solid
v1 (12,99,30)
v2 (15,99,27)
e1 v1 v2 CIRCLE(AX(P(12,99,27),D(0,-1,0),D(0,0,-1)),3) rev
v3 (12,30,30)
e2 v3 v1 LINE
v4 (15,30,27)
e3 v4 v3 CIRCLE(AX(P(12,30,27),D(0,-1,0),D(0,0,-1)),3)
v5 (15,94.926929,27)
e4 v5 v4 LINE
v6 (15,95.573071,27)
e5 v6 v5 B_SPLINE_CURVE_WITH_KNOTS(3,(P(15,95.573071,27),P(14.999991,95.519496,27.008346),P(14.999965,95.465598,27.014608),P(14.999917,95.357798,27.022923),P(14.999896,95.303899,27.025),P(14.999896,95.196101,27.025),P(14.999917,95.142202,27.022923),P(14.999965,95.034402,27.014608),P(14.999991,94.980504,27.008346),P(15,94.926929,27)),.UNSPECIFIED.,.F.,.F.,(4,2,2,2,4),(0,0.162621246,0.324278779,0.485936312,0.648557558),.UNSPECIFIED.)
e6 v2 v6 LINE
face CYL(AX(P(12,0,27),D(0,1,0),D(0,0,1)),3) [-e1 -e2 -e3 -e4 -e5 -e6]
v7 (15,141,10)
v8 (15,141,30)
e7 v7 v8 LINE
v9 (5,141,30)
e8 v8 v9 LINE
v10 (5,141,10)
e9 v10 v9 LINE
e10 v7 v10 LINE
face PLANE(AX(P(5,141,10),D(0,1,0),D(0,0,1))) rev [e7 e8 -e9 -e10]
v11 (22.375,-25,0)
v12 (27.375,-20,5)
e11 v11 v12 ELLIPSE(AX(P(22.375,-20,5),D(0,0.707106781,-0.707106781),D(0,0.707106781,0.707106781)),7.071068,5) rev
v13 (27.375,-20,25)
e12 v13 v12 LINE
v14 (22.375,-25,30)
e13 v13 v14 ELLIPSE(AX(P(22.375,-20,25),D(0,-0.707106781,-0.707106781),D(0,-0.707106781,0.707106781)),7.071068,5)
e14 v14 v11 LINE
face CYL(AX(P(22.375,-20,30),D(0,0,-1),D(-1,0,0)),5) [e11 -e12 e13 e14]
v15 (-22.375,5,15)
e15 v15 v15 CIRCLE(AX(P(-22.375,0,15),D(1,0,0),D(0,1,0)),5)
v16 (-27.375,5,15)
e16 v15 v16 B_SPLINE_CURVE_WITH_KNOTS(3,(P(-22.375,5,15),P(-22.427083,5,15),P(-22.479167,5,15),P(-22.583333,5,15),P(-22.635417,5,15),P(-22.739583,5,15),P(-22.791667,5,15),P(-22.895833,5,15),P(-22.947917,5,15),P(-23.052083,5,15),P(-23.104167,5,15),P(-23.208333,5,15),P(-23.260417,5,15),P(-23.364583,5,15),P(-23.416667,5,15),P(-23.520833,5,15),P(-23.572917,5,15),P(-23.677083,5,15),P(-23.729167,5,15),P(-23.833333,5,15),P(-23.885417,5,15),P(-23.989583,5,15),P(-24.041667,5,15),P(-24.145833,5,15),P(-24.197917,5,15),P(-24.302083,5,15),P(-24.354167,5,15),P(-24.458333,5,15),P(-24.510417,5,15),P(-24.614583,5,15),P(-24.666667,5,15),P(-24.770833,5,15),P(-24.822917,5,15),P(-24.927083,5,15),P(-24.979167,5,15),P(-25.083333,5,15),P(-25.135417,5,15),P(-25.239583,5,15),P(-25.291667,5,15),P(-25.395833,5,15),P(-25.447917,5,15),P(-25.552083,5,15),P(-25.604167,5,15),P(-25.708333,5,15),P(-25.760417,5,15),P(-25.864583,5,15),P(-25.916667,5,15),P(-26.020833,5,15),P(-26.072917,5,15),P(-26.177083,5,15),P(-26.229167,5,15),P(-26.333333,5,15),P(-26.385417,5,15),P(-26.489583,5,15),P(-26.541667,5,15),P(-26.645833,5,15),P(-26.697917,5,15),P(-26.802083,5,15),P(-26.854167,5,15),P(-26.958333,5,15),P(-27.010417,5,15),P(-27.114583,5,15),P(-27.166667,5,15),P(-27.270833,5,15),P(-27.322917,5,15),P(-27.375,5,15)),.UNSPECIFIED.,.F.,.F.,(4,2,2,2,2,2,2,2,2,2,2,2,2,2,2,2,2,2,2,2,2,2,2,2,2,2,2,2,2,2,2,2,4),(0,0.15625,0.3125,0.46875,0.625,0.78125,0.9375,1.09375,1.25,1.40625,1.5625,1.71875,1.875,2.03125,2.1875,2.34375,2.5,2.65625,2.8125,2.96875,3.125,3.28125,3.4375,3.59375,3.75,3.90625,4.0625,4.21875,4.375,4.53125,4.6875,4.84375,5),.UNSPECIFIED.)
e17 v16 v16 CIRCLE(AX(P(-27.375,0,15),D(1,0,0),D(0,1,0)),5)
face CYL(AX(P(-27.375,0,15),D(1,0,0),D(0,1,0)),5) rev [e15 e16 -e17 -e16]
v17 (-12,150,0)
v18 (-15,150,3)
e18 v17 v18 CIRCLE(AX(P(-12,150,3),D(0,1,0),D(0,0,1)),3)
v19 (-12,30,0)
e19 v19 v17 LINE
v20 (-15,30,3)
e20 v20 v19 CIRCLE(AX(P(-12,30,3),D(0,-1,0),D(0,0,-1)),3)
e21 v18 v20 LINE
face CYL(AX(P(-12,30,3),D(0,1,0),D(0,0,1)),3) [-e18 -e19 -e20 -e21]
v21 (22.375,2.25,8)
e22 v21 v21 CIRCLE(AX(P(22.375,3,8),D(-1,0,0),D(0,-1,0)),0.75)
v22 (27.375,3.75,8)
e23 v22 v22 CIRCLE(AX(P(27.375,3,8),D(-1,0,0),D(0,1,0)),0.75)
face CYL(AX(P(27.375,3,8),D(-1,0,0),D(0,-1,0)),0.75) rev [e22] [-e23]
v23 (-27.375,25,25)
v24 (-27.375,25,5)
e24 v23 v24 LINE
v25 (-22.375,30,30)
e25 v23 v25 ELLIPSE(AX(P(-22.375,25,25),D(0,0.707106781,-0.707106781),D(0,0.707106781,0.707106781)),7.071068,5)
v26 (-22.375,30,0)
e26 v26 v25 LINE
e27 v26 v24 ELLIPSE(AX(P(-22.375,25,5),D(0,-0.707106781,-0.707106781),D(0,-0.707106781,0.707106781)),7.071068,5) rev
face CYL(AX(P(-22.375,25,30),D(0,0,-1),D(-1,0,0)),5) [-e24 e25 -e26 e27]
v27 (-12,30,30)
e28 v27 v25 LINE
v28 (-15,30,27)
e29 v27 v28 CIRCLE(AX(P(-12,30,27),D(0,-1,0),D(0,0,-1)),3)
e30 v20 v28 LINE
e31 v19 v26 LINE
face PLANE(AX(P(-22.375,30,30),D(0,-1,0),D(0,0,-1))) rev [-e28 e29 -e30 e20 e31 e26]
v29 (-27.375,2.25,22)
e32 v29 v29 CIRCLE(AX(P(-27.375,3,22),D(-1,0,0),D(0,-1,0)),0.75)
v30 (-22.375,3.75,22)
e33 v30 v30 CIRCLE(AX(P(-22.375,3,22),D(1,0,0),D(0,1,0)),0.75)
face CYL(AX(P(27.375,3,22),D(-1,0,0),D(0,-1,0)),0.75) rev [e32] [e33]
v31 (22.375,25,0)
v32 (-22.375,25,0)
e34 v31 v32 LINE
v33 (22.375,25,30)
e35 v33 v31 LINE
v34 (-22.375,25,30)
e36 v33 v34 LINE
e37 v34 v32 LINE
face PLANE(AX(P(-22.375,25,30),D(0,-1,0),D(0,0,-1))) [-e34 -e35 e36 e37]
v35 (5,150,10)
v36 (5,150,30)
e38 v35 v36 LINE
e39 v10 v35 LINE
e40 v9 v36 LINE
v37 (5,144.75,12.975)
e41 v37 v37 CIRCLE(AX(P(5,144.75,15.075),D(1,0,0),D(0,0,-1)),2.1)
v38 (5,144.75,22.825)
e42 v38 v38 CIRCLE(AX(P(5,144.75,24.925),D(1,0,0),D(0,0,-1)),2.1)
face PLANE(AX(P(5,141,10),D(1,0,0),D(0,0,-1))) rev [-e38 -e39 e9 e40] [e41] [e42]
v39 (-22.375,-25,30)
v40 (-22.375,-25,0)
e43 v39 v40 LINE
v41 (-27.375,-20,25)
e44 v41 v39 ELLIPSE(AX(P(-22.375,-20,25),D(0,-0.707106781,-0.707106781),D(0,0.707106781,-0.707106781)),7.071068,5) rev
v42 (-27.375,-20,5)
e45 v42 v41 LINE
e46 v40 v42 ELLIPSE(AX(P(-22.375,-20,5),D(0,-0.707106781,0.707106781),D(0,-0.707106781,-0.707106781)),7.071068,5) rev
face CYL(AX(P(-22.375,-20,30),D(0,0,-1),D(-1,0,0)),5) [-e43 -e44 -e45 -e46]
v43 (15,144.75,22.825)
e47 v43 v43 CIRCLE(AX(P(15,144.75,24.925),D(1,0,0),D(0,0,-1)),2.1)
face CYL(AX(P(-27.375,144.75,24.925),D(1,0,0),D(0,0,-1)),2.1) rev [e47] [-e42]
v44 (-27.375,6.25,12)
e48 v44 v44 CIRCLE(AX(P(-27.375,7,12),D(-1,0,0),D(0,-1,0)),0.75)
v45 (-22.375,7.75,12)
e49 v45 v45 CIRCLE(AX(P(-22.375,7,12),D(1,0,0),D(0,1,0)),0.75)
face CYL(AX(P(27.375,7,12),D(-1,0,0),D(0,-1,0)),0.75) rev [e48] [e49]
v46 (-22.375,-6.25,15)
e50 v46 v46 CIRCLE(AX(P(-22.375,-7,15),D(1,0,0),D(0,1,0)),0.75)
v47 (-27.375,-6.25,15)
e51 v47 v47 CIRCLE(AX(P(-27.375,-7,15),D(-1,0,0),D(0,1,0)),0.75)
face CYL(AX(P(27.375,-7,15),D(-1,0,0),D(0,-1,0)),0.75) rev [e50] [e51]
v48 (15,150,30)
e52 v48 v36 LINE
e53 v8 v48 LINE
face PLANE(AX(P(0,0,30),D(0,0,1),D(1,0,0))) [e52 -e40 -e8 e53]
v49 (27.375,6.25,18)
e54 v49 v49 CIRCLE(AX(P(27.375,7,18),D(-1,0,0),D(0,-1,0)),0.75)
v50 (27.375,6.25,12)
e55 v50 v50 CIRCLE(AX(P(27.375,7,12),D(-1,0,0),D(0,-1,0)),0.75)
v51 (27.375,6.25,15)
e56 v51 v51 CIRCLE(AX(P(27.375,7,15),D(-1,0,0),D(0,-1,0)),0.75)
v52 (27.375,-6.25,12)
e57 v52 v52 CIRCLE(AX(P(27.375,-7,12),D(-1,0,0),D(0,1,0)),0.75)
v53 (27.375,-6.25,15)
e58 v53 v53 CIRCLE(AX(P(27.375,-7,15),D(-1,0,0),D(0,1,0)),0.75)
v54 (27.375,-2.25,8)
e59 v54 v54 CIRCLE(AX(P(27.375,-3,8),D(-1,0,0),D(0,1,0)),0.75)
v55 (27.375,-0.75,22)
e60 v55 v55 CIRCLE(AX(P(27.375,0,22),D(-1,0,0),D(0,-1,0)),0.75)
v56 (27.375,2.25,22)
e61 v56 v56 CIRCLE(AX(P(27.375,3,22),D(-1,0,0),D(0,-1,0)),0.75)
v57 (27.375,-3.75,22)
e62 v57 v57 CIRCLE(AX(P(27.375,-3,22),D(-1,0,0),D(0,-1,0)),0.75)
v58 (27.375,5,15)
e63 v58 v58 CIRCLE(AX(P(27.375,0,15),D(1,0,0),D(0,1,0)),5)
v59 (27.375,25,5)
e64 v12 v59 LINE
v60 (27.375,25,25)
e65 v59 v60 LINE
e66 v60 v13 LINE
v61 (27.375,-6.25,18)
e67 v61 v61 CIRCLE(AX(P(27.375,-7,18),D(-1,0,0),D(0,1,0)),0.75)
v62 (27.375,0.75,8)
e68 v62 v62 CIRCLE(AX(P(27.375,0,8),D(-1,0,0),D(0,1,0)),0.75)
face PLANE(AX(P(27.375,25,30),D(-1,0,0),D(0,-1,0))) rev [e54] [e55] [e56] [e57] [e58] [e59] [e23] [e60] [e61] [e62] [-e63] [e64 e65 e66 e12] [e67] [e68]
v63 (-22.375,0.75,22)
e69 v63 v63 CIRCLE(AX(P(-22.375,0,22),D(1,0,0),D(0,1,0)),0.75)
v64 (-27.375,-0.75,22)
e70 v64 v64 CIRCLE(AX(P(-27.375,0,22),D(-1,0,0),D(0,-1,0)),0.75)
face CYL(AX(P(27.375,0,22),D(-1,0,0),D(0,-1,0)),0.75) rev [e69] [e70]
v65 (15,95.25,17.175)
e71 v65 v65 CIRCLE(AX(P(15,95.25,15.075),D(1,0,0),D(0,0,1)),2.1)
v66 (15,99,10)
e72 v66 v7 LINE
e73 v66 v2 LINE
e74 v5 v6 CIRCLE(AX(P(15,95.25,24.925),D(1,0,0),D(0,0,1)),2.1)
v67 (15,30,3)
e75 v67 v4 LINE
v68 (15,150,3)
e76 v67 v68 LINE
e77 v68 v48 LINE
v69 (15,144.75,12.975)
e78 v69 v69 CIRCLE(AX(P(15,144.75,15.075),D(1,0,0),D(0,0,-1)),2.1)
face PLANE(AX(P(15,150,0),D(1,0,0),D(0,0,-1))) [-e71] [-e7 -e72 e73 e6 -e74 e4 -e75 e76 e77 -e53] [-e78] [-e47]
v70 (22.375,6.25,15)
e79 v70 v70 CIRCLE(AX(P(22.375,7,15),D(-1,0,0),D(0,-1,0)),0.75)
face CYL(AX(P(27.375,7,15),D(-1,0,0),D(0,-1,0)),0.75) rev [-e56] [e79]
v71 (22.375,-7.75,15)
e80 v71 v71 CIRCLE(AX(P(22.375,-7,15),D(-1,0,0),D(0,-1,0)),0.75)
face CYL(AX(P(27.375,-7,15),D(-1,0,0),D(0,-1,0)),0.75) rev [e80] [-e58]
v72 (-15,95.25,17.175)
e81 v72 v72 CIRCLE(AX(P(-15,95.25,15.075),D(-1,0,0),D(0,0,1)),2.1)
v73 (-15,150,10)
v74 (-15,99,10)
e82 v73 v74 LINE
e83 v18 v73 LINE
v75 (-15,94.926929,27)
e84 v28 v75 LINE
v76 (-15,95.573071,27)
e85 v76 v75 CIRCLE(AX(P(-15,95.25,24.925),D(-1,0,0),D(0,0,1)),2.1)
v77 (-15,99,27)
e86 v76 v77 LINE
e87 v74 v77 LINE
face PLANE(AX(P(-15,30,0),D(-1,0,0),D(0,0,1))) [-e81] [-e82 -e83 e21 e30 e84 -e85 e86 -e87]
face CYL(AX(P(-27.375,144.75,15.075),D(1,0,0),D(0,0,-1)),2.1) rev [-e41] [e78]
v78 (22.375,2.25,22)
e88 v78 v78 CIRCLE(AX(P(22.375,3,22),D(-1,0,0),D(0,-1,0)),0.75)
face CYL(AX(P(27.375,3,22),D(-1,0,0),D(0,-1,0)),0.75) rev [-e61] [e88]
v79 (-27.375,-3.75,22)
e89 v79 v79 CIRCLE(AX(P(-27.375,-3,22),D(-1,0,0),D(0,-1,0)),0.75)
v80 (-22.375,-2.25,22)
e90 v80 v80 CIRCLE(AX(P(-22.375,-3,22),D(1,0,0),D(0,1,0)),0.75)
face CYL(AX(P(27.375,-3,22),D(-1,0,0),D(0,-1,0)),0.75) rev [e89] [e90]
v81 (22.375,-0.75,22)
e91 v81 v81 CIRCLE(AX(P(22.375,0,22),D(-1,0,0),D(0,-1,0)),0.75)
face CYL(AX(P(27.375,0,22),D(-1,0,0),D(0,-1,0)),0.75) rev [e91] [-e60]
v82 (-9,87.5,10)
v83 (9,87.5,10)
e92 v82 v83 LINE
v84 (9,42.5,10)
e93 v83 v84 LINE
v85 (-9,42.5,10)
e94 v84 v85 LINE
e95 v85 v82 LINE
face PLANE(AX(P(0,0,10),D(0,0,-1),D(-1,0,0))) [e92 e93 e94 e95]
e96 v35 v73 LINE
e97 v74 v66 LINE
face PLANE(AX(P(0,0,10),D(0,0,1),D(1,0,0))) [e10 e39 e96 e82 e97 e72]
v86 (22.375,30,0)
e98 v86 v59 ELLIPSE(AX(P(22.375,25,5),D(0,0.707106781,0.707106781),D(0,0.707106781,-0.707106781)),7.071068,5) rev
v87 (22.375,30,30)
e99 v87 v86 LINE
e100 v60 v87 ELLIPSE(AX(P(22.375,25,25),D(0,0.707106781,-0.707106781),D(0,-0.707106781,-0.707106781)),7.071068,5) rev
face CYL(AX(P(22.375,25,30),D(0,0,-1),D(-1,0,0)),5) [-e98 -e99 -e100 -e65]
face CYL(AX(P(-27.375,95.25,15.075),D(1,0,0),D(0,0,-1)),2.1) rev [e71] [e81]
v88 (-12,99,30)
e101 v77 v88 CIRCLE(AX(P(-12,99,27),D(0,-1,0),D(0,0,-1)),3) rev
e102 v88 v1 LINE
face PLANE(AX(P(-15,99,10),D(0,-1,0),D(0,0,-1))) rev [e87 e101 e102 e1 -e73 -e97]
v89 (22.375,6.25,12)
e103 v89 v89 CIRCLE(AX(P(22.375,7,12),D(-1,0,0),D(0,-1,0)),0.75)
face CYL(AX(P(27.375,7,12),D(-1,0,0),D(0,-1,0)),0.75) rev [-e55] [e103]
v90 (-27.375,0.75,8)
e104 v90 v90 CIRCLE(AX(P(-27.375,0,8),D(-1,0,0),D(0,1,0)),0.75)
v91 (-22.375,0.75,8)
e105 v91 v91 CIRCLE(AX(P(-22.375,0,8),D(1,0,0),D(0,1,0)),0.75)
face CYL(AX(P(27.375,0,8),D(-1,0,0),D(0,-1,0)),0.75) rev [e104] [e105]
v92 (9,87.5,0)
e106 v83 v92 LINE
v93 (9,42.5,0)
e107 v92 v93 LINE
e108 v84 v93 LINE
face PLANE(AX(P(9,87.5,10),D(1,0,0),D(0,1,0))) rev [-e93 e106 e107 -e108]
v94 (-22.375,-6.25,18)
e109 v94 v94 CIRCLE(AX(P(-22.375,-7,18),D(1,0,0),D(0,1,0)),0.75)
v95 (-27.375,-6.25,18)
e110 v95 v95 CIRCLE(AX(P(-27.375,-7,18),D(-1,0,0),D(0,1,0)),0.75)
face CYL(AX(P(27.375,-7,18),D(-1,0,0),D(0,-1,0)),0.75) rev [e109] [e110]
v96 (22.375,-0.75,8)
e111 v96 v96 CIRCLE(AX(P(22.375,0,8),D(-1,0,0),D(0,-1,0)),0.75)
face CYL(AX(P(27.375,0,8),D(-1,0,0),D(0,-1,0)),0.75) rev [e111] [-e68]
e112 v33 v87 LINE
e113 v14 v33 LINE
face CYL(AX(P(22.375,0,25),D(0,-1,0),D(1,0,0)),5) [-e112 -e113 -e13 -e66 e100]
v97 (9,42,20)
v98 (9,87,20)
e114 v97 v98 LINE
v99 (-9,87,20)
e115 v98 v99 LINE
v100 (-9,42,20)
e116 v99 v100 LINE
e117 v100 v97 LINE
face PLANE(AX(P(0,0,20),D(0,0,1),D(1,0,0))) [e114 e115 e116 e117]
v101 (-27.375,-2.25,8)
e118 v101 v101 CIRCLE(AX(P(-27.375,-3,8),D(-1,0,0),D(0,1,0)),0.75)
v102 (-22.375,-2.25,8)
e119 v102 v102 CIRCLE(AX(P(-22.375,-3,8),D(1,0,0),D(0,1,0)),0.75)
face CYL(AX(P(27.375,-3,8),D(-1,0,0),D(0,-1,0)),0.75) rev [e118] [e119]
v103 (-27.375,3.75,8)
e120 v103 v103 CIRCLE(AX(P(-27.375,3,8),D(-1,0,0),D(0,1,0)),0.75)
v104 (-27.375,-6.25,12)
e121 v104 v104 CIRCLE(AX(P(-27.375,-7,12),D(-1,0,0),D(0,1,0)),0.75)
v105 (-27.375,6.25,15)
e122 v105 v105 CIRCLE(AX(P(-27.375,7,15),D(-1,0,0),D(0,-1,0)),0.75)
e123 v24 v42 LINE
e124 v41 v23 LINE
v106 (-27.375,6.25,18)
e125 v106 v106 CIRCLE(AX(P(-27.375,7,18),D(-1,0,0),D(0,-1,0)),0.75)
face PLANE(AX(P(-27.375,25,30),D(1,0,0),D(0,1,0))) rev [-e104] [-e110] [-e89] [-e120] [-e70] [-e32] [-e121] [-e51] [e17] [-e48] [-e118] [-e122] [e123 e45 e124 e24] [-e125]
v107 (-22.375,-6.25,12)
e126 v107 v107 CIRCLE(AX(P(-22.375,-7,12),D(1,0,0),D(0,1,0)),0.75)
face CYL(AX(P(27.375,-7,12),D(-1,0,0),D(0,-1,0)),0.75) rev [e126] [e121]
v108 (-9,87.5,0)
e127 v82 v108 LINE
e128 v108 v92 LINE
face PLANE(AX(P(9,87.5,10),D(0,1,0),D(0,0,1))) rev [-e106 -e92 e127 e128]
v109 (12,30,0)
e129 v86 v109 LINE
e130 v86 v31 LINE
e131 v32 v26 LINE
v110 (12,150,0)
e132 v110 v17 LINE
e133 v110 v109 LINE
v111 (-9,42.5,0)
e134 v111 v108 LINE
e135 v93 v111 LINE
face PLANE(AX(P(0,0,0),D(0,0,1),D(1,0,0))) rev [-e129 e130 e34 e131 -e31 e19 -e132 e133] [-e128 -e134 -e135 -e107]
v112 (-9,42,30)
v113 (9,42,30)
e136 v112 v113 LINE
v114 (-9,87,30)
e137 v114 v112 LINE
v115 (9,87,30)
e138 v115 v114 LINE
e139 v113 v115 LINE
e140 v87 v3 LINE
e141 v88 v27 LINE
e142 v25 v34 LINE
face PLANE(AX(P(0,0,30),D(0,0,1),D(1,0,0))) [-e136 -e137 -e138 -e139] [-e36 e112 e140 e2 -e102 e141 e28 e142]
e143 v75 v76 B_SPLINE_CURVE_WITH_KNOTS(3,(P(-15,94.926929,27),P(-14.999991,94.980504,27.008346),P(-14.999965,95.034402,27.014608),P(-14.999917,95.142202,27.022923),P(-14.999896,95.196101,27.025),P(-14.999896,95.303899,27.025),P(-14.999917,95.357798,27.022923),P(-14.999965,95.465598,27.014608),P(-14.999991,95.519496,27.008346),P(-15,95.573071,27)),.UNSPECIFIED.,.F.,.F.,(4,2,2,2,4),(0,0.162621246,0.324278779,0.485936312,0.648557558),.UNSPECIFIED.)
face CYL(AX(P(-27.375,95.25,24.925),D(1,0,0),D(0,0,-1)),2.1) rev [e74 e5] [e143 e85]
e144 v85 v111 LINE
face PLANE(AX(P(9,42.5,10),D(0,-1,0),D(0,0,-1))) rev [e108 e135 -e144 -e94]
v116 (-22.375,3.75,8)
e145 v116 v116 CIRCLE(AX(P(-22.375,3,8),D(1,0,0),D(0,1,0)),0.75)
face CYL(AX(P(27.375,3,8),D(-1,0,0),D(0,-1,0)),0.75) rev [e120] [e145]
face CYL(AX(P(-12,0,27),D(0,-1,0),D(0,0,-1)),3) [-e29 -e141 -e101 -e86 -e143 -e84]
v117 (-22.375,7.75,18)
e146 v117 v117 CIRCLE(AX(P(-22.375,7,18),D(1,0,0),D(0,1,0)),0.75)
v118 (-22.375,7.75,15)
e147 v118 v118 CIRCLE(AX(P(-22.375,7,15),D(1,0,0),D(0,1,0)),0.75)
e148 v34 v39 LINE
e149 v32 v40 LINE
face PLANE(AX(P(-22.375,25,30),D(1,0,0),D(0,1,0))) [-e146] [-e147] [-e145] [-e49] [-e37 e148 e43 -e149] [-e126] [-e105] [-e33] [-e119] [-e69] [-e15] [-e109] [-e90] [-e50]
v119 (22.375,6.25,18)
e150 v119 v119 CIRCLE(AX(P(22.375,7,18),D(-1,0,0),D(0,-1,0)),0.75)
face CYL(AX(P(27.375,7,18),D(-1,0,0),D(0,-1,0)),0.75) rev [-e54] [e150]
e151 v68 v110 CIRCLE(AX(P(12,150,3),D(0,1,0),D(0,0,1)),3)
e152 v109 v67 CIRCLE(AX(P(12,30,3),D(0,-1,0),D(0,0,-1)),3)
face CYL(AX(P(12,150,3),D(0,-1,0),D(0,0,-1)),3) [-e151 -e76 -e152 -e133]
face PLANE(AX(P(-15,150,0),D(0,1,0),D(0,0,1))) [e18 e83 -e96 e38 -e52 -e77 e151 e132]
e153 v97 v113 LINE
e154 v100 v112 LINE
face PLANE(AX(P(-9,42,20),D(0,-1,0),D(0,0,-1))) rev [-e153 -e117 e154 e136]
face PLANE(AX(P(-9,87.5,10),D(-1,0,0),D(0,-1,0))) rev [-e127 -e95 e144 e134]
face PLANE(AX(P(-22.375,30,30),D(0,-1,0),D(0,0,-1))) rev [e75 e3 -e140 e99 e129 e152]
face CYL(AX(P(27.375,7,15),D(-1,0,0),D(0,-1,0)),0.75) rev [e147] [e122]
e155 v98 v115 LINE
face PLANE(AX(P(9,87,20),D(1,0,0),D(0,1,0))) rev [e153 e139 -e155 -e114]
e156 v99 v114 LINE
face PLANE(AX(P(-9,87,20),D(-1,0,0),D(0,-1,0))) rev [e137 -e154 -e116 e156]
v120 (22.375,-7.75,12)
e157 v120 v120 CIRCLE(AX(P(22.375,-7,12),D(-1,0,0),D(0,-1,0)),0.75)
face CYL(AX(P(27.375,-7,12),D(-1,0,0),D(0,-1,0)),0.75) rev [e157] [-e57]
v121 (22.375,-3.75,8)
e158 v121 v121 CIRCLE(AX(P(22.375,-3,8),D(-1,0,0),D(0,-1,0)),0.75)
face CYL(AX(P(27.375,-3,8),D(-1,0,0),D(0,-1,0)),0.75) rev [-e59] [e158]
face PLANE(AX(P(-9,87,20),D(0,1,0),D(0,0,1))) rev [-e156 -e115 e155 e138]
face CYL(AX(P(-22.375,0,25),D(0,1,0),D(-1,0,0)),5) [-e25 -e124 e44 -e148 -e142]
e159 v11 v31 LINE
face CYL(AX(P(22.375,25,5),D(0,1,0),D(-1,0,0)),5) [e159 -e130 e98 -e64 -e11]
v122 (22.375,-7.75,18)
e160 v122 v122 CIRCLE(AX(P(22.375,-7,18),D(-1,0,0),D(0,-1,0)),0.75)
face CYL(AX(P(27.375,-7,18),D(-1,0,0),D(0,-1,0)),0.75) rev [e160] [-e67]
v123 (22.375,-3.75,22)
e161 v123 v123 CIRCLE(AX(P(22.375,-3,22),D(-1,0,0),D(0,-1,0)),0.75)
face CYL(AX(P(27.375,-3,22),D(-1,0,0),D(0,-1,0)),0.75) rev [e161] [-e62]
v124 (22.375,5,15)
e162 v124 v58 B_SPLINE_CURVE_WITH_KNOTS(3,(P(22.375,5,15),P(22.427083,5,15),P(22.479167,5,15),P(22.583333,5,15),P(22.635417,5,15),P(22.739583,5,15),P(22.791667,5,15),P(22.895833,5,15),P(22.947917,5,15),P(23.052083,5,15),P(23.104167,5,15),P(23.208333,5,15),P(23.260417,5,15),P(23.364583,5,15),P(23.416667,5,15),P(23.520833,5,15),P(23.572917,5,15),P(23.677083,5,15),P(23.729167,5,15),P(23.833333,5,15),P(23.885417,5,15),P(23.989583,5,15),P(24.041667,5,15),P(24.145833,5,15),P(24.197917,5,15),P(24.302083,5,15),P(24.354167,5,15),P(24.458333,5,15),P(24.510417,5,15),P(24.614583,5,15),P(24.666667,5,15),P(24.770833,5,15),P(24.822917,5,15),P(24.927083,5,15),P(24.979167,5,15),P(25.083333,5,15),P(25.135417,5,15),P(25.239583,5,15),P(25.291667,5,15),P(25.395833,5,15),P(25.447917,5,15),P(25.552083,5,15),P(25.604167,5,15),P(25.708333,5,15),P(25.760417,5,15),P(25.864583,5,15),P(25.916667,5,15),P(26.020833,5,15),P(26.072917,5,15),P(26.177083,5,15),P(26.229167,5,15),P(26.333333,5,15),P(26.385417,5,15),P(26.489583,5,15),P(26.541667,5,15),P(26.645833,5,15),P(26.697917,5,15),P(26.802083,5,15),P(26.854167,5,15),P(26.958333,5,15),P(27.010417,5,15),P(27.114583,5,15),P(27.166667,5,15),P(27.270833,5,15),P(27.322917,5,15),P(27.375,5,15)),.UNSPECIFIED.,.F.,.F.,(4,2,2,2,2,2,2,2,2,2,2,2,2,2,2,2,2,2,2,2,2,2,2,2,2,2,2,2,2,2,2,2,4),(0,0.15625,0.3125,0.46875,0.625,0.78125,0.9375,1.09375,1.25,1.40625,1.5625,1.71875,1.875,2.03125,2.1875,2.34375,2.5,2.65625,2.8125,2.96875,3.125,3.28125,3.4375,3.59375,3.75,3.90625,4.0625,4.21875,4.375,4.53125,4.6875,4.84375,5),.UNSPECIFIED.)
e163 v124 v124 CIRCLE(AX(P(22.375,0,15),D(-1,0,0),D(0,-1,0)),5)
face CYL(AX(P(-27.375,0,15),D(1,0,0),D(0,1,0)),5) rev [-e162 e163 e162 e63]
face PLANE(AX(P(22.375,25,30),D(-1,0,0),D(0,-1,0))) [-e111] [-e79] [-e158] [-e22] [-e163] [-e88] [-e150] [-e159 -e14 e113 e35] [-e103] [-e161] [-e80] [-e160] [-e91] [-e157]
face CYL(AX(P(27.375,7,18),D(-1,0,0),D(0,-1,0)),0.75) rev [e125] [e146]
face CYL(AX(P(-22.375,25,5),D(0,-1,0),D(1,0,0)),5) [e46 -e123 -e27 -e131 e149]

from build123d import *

# Parameters (mm, degrees)
SKETCH_1_W          = 44.75
SKETCH_1_H          = 50
EXTRUDE_1_DEPTH     = 30
SHELL_1_T           = 5
FILLET_1_R          = 5
SKETCH_2_R          = 0.75
CUT_EXTRUDE_1_DEPTH = 70.264438928
SKETCH_3_R          = 5
CUT_EXTRUDE_2_DEPTH = 70.264438928
EXTRUDE_2_DEPTH     = 30
CUT_EXTRUDE_3_DEPTH = 20
SKETCH_7_R          = 2.1
CUT_EXTRUDE_4_DEPTH = 159.731347329
SKETCH_8_W          = 18
SKETCH_8_H          = 45
CUT_EXTRUDE_5_DEPTH = 10
SKETCH_9_W          = 18
SKETCH_9_H          = 45
CUT_EXTRUDE_6_DEPTH = 10
FILLET_2_R          = 3


with BuildPart() as part:
    # 草图1 → 凸台-拉伸1 (new body)
    with BuildSketch(Plane.XY):
        Rectangle(SKETCH_1_W, SKETCH_1_H)
    extrude(amount=EXTRUDE_1_DEPTH)

    # 抽壳1
    shell_1_openings = [part.faces().sort_by_distance(p)[0] for p in [
        (0, -25, 15),
        (0, 0, 0),
        (0, 0, 30),
    ]]
    offset(amount=SHELL_1_T, openings=shell_1_openings, kind=Kind.INTERSECTION)

    # 圆角1
    # the kernel refuses this fillet: 5 mm, written as the material it takes off along each edge
    with BuildSketch(Plane(origin=(-27.375, 30, -12.5), x_dir=(1, 0, 0), z_dir=(0, 0, 1)), Plane(origin=(-27.375, -25, 42.5), x_dir=(1, 0, 0), z_dir=(0, 0, -1)), Plane(origin=(27.375, -25, -12.5), x_dir=(-1, 0, 0), z_dir=(0, 0, 1)), Plane(origin=(27.375, 30, 42.5), x_dir=(-1, 0, 0), z_dir=(0, 0, -1))) as fillet_1_piece_1:
        with BuildLine():
            CenterArc((FILLET_1_R, -FILLET_1_R), FILLET_1_R, 90, 90)
            Line((0, -FILLET_1_R), (0, 0))
            Line((0, 0), (FILLET_1_R, 0))
        make_face()
    extrude(amount=55, mode=Mode.SUBTRACT)
    with BuildSketch(Plane(origin=(-27.375, -37.5, 30), x_dir=(1, 0, 0), z_dir=(0, 1, 0)), Plane(origin=(27.375, 42.5, 30), x_dir=(-1, 0, 0), z_dir=(0, -1, 0))) as fillet_1_piece_2:
        with BuildLine():
            CenterArc((FILLET_1_R, FILLET_1_R), FILLET_1_R, 180, 90)
            Line((0, FILLET_1_R), (0, 0))
            Line((0, 0), (FILLET_1_R, 0))
        make_face()
    extrude(amount=80, mode=Mode.SUBTRACT)
    with BuildSketch(Plane(origin=(-27.375, -37.5, 0), x_dir=(1, 0, 0), z_dir=(0, 1, 0)), Plane(origin=(27.375, 42.5, 0), x_dir=(-1, 0, 0), z_dir=(0, -1, 0))) as fillet_1_piece_3:
        with BuildLine():
            CenterArc((FILLET_1_R, -FILLET_1_R), FILLET_1_R, 90, 90)
            Line((0, -FILLET_1_R), (0, 0))
            Line((0, 0), (FILLET_1_R, 0))
        make_face()
    extrude(amount=80, mode=Mode.SUBTRACT)

    # 草图2 → 切除-拉伸1 (cut, through all)
    with BuildSketch(Plane.ZY.offset(27.375)):
        with Locations(Location((15, 7, 0), (0, 0, 270))):
            Circle(SKETCH_2_R)
        with Locations(Location((12, 7, 0), (0, 0, 270))):
            Circle(SKETCH_2_R)
        with Locations(Location((18, 7, 0), (0, 0, 270))):
            Circle(SKETCH_2_R)
        with Locations(Location((8, -3, 0), (0, 0, 90))):
            Circle(SKETCH_2_R)
        with Locations(Location((8, 0, 0), (0, 0, 90))):
            Circle(SKETCH_2_R)
        with Locations(Location((8, 3, 0), (0, 0, 90))):
            Circle(SKETCH_2_R)
        with Locations(Location((12, -7, 0), (0, 0, 90))):
            Circle(SKETCH_2_R)
        with Locations(Location((15, -7, 0), (0, 0, 90))):
            Circle(SKETCH_2_R)
        with Locations(Location((18, -7, 0), (0, 0, 90))):
            Circle(SKETCH_2_R)
        with Locations(Location((22, -3, 0), (0, 0, 270))):
            Circle(SKETCH_2_R)
        with Locations(Location((22, 0, 0), (0, 0, 270))):
            Circle(SKETCH_2_R)
        with Locations(Location((22, 3, 0), (0, 0, 270))):
            Circle(SKETCH_2_R)
    extrude(amount=-CUT_EXTRUDE_1_DEPTH, mode=Mode.SUBTRACT)

    # 草图3 → 切除-拉伸2 (cut, through all)
    with BuildSketch(Plane(origin=(27.375, 0, 0), x_dir=(0, 0, -1), z_dir=(1, 0, 0))):
        with Locations(Location((-15, 0, 0), (0, 0, 90))):
            Circle(SKETCH_3_R)
    extrude(amount=-CUT_EXTRUDE_2_DEPTH, mode=Mode.SUBTRACT)

    # 草图4 → 凸台-拉伸2 (add)
    with BuildSketch(Plane.XY.offset(30)):
        Polygon((0, 30), (-15, 30), (-15, 150), (15, 150), (15, 30), align=None)
    extrude(amount=-EXTRUDE_2_DEPTH)

    # 草图6 → 切除-拉伸3 (cut)
    with BuildSketch(Plane.XY.offset(30)):
        Polygon((-15, 99), (15, 99), (15, 141), (5, 141), (5, 150), (-15, 150), (-15, 141), align=None)
    extrude(amount=-CUT_EXTRUDE_3_DEPTH, mode=Mode.SUBTRACT)

    # 草图7 → 切除-拉伸4 (cut, through all)
    with BuildSketch(Plane(origin=(15, 0, 0), x_dir=(0, 0, -1), z_dir=(1, 0, 0))):
        with Locations((-24.925, 144.75)):
            Circle(SKETCH_7_R)
        with Locations((-15.075, 144.75)):
            Circle(SKETCH_7_R)
        with Locations(Location((-15.075, 95.25, 0), (0, 0, 180))):
            Circle(SKETCH_7_R)
        with Locations(Location((-24.925, 95.25, 0), (0, 0, 180))):
            Circle(SKETCH_7_R)
    extrude(amount=-CUT_EXTRUDE_4_DEPTH, mode=Mode.SUBTRACT)

    # 草图8 → 切除-拉伸5 (cut)
    with BuildSketch(Plane.XY.offset(30)):
        with Locations((0, 64.5)):
            Rectangle(SKETCH_8_W, SKETCH_8_H)
    extrude(amount=-CUT_EXTRUDE_5_DEPTH, mode=Mode.SUBTRACT)

    # 草图9 → 切除-拉伸6 (cut)
    with BuildSketch(Plane(origin=(0, 0, 0), x_dir=(-1, 0, 0), z_dir=(0, 0, -1))):
        with Locations((0, 65)):
            Rectangle(SKETCH_9_W, SKETCH_9_H)
    extrude(amount=-CUT_EXTRUDE_6_DEPTH, mode=Mode.SUBTRACT)

    # 圆角2
    fillet_2_edges = [part.edges().sort_by_distance(p)[0] for p in [
        (-15, 90, 0),
        (15, 90, 0),
        (15, 64.5, 30),
        (-15, 64.5, 30),
    ]]
    fillet(fillet_2_edges, radius=FILLET_2_R)


solid = part.part
